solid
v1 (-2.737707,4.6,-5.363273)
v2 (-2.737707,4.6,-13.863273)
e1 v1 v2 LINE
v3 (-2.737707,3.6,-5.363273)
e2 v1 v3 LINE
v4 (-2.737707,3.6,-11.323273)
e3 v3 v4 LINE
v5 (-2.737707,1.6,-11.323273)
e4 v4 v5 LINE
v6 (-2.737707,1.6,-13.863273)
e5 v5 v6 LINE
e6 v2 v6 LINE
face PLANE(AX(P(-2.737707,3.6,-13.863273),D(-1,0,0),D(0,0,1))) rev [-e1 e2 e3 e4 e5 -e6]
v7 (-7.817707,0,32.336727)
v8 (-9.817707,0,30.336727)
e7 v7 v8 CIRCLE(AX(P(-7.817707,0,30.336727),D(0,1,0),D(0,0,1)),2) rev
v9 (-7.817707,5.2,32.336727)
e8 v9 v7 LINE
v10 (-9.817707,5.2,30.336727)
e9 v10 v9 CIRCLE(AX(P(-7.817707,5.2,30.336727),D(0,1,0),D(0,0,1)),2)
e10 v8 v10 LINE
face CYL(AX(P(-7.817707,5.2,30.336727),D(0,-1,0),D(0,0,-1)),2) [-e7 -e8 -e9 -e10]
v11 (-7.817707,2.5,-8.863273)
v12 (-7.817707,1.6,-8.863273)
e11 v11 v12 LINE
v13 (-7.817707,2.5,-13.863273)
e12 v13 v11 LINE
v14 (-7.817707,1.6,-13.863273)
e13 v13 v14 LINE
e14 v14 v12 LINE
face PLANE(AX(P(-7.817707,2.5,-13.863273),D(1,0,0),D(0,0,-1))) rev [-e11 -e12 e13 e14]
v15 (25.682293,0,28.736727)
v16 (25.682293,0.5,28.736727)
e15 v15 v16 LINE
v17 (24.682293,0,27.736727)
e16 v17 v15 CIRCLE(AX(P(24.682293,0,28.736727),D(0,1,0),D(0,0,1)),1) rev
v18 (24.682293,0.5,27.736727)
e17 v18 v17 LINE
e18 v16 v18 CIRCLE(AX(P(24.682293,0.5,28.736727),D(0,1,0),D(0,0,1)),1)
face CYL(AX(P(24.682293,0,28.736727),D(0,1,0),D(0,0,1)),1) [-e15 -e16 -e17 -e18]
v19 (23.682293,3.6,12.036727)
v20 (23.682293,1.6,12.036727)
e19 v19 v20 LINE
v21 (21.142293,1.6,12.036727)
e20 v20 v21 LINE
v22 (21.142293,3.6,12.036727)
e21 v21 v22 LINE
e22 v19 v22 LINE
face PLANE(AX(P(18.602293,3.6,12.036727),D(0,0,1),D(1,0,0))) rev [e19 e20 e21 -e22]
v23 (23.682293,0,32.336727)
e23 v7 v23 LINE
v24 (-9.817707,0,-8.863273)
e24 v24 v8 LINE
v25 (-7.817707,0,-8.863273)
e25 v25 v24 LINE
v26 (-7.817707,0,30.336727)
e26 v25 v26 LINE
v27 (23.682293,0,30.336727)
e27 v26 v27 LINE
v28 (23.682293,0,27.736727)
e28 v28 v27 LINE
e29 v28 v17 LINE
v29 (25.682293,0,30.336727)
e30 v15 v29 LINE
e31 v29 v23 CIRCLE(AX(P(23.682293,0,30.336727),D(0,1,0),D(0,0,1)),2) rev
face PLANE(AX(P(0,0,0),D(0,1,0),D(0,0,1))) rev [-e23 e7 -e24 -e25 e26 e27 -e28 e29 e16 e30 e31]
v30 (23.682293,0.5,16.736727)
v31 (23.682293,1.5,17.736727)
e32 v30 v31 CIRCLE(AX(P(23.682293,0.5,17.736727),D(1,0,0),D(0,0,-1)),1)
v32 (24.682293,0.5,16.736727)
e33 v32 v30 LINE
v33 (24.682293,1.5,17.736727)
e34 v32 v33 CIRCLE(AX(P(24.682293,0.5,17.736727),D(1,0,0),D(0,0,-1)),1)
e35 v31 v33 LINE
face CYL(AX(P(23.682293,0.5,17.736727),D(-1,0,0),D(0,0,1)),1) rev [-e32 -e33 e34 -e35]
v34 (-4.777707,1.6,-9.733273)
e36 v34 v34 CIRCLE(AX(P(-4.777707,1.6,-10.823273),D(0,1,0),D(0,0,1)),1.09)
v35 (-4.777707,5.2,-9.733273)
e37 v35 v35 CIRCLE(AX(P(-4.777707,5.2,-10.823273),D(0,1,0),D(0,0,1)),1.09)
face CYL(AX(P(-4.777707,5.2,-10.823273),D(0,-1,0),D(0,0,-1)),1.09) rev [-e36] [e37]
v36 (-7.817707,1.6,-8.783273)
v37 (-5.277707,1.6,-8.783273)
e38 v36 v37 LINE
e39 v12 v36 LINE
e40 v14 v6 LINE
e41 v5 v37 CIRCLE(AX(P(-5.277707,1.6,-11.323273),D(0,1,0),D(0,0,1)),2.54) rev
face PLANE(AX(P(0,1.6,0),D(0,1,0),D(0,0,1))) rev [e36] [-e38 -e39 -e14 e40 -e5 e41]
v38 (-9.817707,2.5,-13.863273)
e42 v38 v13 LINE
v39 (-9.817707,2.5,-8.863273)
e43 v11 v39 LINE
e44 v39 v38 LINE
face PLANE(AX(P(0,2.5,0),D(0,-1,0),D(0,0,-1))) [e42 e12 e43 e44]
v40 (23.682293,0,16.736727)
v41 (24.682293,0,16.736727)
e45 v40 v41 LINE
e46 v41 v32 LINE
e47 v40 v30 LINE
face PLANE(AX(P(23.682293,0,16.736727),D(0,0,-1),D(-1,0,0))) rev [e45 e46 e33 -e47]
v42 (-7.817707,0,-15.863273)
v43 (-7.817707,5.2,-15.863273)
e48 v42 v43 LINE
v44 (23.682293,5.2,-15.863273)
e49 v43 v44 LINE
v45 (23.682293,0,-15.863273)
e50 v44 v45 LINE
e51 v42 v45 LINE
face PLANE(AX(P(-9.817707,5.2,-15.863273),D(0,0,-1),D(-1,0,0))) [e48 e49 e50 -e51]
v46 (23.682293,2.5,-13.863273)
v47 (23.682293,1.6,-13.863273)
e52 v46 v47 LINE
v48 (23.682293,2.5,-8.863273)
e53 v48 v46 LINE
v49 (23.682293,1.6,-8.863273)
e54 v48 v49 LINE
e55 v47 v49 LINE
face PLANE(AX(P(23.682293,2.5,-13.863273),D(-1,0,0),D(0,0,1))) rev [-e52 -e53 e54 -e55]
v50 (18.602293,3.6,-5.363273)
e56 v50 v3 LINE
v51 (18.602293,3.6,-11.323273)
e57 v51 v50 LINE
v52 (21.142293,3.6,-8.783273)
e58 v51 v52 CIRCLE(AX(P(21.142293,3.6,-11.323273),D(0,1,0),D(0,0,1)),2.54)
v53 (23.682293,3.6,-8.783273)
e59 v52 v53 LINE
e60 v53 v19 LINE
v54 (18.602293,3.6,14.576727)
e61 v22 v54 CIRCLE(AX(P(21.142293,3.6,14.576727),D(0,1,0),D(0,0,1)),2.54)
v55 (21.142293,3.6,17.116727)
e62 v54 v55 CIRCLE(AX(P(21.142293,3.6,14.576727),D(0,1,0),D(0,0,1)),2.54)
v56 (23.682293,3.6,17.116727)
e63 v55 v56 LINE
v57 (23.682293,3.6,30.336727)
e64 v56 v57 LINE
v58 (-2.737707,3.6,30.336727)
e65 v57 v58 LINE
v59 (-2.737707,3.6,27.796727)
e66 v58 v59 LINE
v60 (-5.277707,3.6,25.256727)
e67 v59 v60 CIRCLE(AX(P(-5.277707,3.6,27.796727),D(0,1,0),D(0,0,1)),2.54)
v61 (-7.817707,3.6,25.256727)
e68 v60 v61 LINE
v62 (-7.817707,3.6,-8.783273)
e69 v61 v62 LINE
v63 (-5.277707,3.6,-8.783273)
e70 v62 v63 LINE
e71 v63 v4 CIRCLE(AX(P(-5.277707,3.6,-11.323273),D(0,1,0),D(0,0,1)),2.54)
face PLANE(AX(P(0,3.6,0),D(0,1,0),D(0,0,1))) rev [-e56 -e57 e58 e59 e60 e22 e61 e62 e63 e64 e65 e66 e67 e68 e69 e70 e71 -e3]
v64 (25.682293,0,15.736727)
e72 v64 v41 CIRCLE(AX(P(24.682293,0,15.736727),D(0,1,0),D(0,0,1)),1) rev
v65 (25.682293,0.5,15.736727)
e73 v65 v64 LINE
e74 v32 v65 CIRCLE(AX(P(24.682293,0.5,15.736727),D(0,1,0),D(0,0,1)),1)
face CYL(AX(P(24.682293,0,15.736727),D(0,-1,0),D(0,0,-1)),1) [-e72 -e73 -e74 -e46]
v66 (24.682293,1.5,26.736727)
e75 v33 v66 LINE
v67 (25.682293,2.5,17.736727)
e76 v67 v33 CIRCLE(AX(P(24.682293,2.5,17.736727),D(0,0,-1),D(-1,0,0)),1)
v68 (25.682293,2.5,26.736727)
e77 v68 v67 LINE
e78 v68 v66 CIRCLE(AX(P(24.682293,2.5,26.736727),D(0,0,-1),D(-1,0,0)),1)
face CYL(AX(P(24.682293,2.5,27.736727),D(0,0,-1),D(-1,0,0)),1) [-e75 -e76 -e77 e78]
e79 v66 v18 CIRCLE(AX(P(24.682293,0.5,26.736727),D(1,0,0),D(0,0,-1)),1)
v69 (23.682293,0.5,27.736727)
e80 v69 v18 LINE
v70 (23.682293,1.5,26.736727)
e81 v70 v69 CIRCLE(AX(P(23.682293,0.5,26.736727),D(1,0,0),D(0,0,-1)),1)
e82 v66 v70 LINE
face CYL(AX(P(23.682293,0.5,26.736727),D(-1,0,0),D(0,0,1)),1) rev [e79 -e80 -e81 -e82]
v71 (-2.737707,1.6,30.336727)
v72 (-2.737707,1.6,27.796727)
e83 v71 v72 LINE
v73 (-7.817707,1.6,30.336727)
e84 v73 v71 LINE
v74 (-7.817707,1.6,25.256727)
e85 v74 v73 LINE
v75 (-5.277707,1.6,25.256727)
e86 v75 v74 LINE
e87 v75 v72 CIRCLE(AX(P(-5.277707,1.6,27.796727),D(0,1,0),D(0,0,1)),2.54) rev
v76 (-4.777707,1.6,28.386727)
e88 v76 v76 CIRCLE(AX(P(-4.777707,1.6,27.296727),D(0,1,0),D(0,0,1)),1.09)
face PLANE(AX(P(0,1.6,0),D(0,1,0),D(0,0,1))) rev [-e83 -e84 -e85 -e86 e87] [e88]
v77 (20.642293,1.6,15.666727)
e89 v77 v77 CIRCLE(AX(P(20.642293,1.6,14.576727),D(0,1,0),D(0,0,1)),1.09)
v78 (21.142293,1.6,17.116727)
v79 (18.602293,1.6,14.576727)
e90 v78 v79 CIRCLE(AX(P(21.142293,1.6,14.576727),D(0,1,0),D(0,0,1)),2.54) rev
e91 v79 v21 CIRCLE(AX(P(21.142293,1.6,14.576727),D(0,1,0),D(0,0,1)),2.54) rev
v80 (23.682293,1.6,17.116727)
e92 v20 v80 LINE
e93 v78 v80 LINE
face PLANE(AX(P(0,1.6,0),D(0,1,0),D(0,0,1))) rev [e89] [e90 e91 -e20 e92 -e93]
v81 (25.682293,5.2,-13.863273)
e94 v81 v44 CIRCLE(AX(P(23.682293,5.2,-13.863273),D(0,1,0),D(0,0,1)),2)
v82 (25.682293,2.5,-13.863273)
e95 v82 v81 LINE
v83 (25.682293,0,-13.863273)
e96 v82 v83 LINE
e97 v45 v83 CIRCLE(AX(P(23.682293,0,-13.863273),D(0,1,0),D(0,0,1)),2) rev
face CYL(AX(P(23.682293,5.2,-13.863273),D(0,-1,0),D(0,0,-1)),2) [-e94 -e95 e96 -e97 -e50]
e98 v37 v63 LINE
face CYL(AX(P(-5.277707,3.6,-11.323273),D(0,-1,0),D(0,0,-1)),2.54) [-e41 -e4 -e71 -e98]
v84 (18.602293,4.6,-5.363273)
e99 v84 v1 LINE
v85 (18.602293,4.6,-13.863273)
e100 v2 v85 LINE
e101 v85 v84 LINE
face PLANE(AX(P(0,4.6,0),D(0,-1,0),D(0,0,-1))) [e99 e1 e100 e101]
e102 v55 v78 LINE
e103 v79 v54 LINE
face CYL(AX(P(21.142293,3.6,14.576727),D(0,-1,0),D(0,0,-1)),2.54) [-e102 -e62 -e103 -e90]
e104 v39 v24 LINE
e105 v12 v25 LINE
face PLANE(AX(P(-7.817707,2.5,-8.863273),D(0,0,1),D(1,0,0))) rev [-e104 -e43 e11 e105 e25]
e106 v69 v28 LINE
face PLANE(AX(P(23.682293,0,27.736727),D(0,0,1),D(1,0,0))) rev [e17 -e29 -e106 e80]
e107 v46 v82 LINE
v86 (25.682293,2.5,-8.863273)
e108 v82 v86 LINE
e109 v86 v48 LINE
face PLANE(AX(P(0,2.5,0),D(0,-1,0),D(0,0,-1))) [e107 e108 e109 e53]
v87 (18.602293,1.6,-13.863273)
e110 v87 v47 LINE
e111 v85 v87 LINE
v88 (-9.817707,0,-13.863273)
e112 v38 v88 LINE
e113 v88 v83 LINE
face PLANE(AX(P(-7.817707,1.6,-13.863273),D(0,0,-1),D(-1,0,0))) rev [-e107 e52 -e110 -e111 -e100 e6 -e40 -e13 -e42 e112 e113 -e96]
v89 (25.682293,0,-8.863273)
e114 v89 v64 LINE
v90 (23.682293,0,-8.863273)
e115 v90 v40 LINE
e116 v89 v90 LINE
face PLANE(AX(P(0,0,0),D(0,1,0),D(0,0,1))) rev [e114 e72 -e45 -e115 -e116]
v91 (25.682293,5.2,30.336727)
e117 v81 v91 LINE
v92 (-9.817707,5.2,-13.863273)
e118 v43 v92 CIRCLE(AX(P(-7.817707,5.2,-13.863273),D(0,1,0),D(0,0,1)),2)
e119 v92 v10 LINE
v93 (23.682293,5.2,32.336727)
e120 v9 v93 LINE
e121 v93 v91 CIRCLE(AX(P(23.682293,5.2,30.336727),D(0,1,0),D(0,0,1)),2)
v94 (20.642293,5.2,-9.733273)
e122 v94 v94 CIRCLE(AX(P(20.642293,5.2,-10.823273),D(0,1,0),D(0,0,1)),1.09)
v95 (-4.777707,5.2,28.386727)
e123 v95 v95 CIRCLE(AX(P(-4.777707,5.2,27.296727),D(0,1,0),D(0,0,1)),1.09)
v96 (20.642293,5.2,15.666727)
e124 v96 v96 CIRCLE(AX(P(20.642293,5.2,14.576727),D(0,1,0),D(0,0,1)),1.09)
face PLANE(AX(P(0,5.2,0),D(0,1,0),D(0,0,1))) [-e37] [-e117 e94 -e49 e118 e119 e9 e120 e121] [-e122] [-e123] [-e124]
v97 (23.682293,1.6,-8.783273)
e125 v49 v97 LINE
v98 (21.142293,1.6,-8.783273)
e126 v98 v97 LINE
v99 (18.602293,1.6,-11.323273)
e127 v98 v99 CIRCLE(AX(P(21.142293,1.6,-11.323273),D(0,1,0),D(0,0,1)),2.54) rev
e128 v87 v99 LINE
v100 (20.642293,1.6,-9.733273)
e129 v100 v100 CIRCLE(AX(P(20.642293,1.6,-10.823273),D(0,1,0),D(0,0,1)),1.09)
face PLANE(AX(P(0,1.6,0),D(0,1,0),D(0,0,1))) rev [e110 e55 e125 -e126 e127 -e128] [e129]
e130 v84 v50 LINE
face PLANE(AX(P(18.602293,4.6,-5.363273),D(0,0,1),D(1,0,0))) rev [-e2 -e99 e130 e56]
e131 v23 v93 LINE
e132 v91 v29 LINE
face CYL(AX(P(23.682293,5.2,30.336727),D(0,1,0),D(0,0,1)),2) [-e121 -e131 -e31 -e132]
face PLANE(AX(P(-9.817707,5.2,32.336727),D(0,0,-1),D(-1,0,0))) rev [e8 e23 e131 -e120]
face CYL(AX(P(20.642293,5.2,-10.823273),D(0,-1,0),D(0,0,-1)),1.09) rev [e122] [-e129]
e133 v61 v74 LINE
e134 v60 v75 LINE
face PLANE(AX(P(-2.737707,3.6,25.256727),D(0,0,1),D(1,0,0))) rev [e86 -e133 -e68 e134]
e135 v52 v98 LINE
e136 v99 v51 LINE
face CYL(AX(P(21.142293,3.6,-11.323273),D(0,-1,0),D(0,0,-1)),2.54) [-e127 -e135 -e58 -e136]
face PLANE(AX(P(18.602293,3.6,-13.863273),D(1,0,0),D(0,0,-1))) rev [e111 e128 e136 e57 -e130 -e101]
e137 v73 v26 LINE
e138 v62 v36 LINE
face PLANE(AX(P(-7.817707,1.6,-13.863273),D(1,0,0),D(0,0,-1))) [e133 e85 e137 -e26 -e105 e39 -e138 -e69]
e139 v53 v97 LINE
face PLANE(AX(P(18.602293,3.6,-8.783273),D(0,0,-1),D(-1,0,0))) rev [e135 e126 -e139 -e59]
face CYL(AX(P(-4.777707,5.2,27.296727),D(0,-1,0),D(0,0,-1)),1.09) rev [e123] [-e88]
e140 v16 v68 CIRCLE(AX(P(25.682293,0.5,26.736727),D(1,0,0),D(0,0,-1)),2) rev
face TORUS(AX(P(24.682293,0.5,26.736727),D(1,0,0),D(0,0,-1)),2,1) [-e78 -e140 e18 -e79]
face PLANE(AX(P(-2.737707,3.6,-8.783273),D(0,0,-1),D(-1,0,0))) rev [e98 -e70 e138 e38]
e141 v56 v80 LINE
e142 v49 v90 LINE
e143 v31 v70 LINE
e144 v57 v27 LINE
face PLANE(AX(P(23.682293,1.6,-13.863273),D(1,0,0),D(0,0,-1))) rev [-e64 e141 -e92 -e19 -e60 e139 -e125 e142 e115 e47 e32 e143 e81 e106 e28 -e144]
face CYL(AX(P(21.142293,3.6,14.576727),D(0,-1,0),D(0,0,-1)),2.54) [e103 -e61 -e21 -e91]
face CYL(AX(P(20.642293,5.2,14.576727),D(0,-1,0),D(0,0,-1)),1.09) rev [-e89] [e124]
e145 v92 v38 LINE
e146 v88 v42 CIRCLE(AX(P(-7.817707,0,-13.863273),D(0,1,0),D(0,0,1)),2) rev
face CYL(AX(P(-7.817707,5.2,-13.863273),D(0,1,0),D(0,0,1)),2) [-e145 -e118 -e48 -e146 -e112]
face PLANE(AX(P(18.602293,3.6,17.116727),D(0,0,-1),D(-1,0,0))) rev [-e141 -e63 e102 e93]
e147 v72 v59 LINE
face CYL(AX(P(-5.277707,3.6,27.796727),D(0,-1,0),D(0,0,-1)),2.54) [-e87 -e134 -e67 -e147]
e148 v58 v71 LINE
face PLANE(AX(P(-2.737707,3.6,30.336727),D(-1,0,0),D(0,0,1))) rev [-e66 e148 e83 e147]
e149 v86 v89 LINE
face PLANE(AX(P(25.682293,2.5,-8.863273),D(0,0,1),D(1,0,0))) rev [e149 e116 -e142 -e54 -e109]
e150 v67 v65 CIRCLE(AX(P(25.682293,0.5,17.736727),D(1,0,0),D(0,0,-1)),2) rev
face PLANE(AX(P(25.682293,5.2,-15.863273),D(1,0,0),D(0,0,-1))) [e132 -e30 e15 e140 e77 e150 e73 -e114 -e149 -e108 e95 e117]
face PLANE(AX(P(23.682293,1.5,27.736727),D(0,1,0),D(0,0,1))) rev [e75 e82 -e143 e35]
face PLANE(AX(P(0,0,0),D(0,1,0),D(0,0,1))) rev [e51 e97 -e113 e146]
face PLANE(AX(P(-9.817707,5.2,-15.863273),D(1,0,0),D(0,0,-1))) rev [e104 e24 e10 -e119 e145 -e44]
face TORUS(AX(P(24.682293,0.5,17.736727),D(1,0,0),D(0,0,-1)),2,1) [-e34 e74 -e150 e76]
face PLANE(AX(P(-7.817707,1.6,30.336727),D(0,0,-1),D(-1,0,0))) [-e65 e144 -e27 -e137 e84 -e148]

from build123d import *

# Parameters (mm, degrees)
SKETCH1_W           = 35.5
SKETCH1_H           = 48.2
SKETCH1_R           = 1.09
BOSS_EXTRUDE2_DEPTH = 5.2
SKETCH1_4_W         = 31.5
SKETCH1_4_H         = 44.2
CUT_EXTRUDE1_DEPTH  = 1.6
CUT_EXTRUDE2_DEPTH  = 2
SKETCH6_W           = 21.34
SKETCH6_H           = 8.5
CUT_EXTRUDE5_DEPTH  = 1
SKETCH4_W           = 2
SKETCH4_H           = 5
CUT_EXTRUDE3_DEPTH  = 2.5
SKETCH5_W           = 11
SKETCH5_H           = 1.5
CUT_EXTRUDE4_DEPTH  = 2
FILLET1_R           = 2
FILLET3_R           = 2.54
FILLET4_R           = 1
FILLET2_R           = 1


with BuildPart() as part:
    # Sketch1 → Boss-Extrude2 (new body)
    with BuildSketch(Plane(origin=(0, 0, 0), x_dir=(1, 0, 0), z_dir=(0, 1, 0))):
        with Locations((7.932292683, -8.236727254)):
            Rectangle(SKETCH1_W, SKETCH1_H)
        with Locations(Location((20.642292683, 10.823272746, 0), (0, 0, 270))):
            Circle(SKETCH1_R, mode=Mode.SUBTRACT)
        with Locations(Location((-4.777707317, 10.823272746, 0), (0, 0, 270))):
            Circle(SKETCH1_R, mode=Mode.SUBTRACT)
        with Locations(Location((-4.777707317, -27.296727254, 0), (0, 0, 270))):
            Circle(SKETCH1_R, mode=Mode.SUBTRACT)
        with Locations(Location((20.642292683, -14.576727254, 0), (0, 0, 270))):
            Circle(SKETCH1_R, mode=Mode.SUBTRACT)
    extrude(amount=BOSS_EXTRUDE2_DEPTH)

    # Sketch1<4> → Cut-Extrude1 (cut)
    with BuildSketch(Plane(origin=(0, 0, 0), x_dir=(1, 0, 0), z_dir=(0, 1, 0))):
        with Locations((7.932292683, -8.236727254)):
            Rectangle(SKETCH1_4_W, SKETCH1_4_H)
    extrude(amount=CUT_EXTRUDE1_DEPTH, mode=Mode.SUBTRACT)

    # Sketch3 → Cut-Extrude2 (cut)
    with BuildSketch(Plane.XZ.offset(-1.6)):
        Polygon((-2.737707317, -13.863272746), (18.602292683, -13.863272746), (18.602292683, -8.783272746), (23.682292683, -8.783272746), (23.682292683, 12.036727254), (18.602292683, 12.036727254), (18.602292683, 17.116727254), (23.682292683, 17.116727254), (23.682292683, 30.336727254), (-2.737707317, 30.336727254), (-2.737707317, 25.256727254), (-7.817707317, 25.256727254), (-7.817707317, -8.783272746), (-2.737707317, -8.783272746), align=None)
    extrude(amount=-CUT_EXTRUDE2_DEPTH, mode=Mode.SUBTRACT)

    # Sketch6 → Cut-Extrude5 (cut)
    with BuildSketch(Plane.XZ.offset(-3.6)):
        with Locations((7.932292683, -9.613272746)):
            Rectangle(SKETCH6_W, SKETCH6_H)
    extrude(amount=-CUT_EXTRUDE5_DEPTH, mode=Mode.SUBTRACT)

    # Sketch4 → Cut-Extrude3 (cut)
    with BuildSketch(Plane.XZ):
        with Locations((24.682292683, -11.363272746)):
            Rectangle(SKETCH4_W, SKETCH4_H)
        with Locations((-8.817707317, -11.363272746)):
            Rectangle(SKETCH4_W, SKETCH4_H)
    extrude(amount=-CUT_EXTRUDE3_DEPTH, mode=Mode.SUBTRACT)

    # Sketch5 → Cut-Extrude4 (cut)
    with BuildSketch(Plane(origin=(25.682292683, 0, 0), x_dir=(0, 0, -1), z_dir=(1, 0, 0))):
        with Locations((-22.236727254, 0.75)):
            Rectangle(SKETCH5_W, SKETCH5_H)
    extrude(amount=-CUT_EXTRUDE4_DEPTH, mode=Mode.SUBTRACT)

    # Fillet1
    fillet1_edges = [part.edges().sort_by_distance(p)[0] for p in [
        (-9.817707317, 2.6, -15.863272746),
        (25.682292683, 2.6, -15.863272746),
        (25.682292683, 2.6, 32.336727254),
        (-9.817707317, 2.6, 32.336727254),
    ]]
    fillet(fillet1_edges, radius=FILLET1_R - 0.0001)  # a hair under: the kernel refuses the full size

    # Fillet3
    fillet3_edges = [part.edges().sort_by_distance(p)[0] for p in [
        (-2.737707317, 2.6, 25.256727254),
        (18.602292683, 2.6, 17.116727254),
        (18.602292683, 2.6, 12.036727254),
        (18.602292683, 2.6, -8.783272746),
        (-2.737707317, 2.6, -8.783272746),
    ]]
    fillet(fillet3_edges, radius=FILLET3_R - 0.0001)  # a hair under: the kernel refuses the full size

    # Fillet4
    fillet4_edges = [part.edges().sort_by_distance(p)[0] for p in [
        (24.682292683, 1.5, 27.736727254),
        (24.682292683, 1.5, 16.736727254),
    ]]
    fillet(fillet4_edges, radius=FILLET4_R)

    # Fillet2
    fillet2_edges = [part.edges().sort_by_distance(p)[0] for p in [
        (25.682292683, 0.25, 16.736727254),
        (25.682292683, 0.25, 27.736727254),
        (25.682292683, 1.5, 22.236727254),
        (25.682292683, 1.207106781, 27.443834036),
        (25.682292683, 1.207106781, 17.029620473),
    ]]
    fillet(fillet2_edges, radius=FILLET2_R)


solid = part.part
